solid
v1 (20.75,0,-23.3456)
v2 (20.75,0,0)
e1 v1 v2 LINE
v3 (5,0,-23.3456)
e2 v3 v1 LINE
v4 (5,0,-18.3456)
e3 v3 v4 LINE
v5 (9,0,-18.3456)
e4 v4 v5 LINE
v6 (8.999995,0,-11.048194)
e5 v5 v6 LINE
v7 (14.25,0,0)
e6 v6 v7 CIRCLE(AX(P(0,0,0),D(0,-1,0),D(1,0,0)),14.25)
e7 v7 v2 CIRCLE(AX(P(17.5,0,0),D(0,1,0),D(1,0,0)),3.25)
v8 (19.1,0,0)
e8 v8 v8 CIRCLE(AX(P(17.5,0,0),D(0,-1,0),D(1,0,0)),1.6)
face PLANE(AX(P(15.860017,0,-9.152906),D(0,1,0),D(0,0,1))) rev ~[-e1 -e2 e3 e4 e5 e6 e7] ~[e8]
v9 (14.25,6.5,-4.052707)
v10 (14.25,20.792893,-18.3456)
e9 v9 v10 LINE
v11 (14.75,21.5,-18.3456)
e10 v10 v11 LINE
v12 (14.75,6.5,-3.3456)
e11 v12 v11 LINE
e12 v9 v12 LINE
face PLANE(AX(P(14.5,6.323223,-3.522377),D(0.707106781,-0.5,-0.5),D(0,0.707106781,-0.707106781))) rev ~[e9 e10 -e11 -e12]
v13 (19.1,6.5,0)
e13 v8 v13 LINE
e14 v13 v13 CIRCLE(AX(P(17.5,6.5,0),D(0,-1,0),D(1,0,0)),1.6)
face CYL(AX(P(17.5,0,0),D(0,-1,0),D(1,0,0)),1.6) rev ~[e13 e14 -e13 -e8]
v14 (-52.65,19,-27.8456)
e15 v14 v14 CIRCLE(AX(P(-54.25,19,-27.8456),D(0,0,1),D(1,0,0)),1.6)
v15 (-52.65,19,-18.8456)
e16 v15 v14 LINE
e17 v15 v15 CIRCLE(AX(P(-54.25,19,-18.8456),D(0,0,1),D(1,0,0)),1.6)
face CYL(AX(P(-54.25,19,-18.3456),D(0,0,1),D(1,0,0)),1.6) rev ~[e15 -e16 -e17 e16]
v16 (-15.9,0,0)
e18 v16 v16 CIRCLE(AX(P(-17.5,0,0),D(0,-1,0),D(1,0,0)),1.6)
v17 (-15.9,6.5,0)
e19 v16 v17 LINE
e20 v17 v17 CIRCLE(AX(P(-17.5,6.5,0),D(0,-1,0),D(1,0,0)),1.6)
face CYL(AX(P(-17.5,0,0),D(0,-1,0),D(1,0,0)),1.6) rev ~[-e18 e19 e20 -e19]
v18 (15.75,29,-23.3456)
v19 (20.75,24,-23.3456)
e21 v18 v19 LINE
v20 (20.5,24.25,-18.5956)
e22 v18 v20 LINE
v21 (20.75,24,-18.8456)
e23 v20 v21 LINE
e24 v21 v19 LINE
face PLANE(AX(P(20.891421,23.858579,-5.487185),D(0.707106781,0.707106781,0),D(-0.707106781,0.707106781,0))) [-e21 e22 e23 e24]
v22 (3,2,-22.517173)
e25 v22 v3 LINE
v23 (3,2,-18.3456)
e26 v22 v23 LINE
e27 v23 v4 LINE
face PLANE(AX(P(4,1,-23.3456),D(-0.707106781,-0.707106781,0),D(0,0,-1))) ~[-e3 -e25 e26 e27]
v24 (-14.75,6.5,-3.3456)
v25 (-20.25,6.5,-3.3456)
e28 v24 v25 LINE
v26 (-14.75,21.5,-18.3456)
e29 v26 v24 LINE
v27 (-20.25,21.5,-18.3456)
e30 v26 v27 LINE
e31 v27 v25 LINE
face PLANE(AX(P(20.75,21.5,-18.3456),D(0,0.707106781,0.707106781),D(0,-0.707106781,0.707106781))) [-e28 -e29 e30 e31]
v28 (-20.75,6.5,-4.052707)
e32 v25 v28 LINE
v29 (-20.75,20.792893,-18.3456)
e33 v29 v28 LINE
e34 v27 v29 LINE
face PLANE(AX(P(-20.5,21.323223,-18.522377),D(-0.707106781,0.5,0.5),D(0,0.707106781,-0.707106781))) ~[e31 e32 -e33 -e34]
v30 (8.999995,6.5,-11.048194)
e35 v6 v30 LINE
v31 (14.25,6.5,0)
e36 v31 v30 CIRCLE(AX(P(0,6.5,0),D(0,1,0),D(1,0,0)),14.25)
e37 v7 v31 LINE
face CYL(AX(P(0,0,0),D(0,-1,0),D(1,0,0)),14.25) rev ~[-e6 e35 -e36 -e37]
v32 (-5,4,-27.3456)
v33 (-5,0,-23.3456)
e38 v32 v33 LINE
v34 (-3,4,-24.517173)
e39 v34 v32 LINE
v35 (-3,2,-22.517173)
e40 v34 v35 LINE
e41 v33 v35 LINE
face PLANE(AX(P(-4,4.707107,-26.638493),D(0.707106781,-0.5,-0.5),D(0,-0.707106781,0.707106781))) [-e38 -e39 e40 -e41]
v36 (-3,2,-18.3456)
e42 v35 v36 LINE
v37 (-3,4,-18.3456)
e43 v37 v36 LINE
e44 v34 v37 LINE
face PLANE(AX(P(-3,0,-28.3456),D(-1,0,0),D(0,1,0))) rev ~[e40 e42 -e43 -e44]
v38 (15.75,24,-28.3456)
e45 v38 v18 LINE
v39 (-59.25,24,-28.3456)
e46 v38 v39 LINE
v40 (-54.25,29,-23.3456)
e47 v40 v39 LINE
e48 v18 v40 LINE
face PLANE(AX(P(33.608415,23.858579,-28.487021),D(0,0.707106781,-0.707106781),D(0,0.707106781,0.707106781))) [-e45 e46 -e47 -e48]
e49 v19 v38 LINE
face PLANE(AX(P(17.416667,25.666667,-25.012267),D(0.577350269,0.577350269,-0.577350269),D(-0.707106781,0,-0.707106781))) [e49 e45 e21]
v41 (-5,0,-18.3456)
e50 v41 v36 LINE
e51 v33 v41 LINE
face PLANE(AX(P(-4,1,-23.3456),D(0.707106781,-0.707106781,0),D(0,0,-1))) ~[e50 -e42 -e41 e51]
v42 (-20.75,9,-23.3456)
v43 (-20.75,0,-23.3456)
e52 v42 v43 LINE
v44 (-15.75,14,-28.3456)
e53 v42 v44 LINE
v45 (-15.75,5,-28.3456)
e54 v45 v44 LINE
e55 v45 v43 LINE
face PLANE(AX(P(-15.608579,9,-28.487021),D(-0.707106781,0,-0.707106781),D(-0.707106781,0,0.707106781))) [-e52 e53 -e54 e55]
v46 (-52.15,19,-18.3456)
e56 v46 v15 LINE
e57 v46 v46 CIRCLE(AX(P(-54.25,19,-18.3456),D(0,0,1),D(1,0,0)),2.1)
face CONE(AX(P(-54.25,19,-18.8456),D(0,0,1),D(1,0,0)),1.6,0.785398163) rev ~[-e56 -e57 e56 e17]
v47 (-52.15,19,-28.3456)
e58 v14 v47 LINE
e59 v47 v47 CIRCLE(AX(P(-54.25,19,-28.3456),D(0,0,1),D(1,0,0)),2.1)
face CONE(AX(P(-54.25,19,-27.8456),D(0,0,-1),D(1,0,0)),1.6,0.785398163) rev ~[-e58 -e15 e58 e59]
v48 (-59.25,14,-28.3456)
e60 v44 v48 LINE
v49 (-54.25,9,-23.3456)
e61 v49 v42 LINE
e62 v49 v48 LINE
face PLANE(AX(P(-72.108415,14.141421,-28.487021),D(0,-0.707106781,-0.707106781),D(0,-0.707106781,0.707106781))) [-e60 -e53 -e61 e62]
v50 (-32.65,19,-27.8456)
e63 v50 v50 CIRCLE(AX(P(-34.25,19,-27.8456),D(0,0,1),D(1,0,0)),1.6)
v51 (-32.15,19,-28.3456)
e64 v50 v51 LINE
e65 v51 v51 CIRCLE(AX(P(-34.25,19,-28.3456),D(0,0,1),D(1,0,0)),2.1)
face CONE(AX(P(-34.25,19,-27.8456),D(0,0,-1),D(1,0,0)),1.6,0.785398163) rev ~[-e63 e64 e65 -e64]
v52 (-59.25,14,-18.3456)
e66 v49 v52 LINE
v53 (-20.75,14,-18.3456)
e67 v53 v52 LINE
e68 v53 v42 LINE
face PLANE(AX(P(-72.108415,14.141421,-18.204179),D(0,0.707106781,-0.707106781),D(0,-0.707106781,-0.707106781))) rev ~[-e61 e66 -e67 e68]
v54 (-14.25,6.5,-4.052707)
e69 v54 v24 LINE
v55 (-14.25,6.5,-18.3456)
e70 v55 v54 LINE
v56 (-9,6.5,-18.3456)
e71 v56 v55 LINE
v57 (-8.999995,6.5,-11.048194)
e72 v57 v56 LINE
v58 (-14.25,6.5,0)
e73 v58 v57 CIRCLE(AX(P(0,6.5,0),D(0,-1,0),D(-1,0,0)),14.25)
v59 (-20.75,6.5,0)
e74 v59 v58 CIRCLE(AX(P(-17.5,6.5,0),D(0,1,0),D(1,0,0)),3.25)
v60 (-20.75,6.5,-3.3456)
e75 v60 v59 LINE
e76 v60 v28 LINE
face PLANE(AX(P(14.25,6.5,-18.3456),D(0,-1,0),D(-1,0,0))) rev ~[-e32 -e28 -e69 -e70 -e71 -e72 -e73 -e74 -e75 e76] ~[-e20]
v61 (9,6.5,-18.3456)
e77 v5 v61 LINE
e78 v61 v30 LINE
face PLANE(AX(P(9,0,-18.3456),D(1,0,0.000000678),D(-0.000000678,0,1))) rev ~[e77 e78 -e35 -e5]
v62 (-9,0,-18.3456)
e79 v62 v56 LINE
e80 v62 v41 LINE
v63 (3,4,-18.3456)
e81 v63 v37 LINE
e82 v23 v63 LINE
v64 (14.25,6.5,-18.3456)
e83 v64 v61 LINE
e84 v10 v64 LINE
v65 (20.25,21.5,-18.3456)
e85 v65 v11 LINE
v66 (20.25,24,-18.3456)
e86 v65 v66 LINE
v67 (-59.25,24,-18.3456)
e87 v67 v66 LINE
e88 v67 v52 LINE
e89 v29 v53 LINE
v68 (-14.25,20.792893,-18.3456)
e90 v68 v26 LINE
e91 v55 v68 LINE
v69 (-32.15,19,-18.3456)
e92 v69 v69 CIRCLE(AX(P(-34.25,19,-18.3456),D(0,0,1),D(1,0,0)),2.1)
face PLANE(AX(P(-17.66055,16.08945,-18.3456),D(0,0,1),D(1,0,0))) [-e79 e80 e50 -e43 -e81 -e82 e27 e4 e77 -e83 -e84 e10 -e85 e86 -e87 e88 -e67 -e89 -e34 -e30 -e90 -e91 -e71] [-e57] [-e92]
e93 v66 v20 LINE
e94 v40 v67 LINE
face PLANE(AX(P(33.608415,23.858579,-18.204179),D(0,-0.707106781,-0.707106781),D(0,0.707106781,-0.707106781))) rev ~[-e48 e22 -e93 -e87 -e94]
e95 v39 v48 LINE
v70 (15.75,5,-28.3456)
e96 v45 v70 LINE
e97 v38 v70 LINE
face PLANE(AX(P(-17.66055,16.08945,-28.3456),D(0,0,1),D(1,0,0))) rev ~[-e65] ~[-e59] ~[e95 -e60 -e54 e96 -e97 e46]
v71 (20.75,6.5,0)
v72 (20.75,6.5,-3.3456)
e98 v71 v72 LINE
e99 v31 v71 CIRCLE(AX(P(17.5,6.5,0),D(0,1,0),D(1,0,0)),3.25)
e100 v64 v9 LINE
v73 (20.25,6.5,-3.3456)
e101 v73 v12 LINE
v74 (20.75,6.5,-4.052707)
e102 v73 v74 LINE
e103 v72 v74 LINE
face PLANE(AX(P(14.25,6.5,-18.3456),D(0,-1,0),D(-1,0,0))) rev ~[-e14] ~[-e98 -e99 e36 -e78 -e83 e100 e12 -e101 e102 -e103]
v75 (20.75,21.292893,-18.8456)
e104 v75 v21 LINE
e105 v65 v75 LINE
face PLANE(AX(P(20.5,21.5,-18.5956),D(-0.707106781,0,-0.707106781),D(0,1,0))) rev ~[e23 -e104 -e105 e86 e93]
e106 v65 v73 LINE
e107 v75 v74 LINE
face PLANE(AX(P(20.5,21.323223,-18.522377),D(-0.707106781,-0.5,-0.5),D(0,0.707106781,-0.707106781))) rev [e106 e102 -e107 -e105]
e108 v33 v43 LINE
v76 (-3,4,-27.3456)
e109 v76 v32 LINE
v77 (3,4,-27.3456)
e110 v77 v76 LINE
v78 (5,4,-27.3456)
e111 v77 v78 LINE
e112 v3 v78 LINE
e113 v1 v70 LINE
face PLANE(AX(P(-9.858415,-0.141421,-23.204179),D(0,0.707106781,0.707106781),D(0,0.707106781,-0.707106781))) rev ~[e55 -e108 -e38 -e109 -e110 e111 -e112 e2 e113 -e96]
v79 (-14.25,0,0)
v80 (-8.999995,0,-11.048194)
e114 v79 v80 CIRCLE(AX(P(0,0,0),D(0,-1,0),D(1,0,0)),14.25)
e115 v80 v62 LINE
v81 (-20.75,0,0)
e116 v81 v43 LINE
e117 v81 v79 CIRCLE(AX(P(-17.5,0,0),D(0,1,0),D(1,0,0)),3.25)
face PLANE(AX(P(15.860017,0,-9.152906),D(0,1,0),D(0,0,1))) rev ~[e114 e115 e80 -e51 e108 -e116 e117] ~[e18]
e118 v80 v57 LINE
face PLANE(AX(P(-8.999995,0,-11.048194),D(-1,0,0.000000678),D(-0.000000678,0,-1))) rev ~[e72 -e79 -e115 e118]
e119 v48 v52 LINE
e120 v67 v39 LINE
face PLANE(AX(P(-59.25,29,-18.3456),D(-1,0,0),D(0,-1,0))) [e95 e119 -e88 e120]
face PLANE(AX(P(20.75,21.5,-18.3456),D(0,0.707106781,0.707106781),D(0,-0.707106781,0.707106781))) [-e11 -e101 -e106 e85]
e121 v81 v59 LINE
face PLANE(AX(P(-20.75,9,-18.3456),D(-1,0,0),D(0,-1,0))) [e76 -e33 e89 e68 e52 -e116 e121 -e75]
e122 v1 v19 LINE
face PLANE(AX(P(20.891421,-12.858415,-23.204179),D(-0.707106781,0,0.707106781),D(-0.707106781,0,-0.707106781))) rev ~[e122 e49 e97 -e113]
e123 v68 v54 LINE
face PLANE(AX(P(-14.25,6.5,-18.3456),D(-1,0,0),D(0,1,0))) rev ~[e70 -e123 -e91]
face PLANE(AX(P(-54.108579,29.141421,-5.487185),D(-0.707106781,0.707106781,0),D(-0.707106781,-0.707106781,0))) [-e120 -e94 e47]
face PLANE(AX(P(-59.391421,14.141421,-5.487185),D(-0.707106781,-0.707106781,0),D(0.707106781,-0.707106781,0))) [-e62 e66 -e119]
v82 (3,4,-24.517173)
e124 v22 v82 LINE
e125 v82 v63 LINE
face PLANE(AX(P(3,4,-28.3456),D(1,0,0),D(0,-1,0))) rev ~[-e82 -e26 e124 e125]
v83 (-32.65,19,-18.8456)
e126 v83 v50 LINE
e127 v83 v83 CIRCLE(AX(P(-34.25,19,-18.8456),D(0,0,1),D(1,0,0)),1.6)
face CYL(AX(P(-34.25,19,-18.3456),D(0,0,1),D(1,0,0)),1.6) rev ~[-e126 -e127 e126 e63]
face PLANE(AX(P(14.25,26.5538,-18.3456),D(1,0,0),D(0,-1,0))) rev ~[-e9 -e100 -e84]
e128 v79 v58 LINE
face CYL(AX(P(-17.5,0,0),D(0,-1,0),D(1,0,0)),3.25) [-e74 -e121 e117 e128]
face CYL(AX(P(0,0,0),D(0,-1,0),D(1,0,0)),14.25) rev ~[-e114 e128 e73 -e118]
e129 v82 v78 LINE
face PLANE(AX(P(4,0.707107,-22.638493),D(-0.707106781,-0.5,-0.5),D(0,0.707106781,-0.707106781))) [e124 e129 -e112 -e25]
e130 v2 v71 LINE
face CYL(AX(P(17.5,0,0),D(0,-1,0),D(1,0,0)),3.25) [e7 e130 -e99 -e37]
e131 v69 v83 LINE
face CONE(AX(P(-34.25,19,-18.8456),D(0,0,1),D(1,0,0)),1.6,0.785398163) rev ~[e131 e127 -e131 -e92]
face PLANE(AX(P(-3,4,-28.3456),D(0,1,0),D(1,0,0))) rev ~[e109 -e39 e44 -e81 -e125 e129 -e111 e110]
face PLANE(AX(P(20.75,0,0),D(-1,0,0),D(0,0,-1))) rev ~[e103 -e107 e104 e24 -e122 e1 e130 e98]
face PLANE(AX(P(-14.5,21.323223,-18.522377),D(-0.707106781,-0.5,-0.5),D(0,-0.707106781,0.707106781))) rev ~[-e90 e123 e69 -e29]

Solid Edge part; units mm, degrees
sketch "Sketch1" plane through (0, 0, 0) normal (0, -1, 0) x (1, 0, 0)
  circle A0 centre (-17.5, 0) radius 1.6
  line L0 (-20.75, -18.3456) -> (-20.75, 0)
  line L1 (-9, -18.3456) -> (-20.75, -18.3456)
  line L2 (-9, -11.0482) -> (-9, -18.3456)
  arc A1 (-14.25, 0) -> (-9, -11.0482) centre (0, 0) ccw
  arc A2 (-20.75, 0) -> (-14.25, 0) centre (-17.5, 0) cw
  arc A3 (9, -11.0482) -> (14.25, 0) centre (0, 0) ccw
  arc A4 (14.25, 0) -> (20.75, 0) centre (17.5, 0) cw
  line L3 (20.75, 0) -> (20.75, -18.3456)
  line L4 (20.75, -18.3456) -> (9, -18.3456)
  line L5 (9, -18.3456) -> (9, -11.0482)
  circle A5 centre (17.5, 0) radius 1.6
  dimension "D1" = 35
  dimension "D2" = 17.5
  dimension "D3" = 6.5
  dimension "D4" = 9
  dimension "D5" = 9
extrude "Protrusion1" add sketch "Sketch1" against normal blind 6.5
sketch "Sketch2" plane through (14.875, 3.25, -18.3456) normal (0, 0, -1) x (0, -1, 0)
  line L0 (3.25, -5.875) -> (-25.75, -5.875)
  line L1 (-25.75, -5.875) -> (-25.75, 74.125)
  line L2 (-25.75, 74.125) -> (-5.75, 74.125)
  line L3 (-5.75, 74.125) -> (-5.75, 35.625)
  line L4 (-5.75, 35.625) -> (3.25, 35.625)
  line L5 (3.25, 35.625) -> (3.25, -5.875)
  dimension "D1" = 29
  dimension "D2" = 20
  dimension "D3" = 80
extrude "ExtrudedProtrusion_3" add sketch "Sketch2" along normal blind 10
sketch "Sketch3" plane through (-9.25, 14.5, -28.3456) normal (0, 0, -1) x (0, 1, 0)
  line L0 (-14.5, 12.25) -> (-14.5, 6.25)
  line L1 (-14.5, 6.25) -> (-10.5, 6.25)
  line L2 (-10.5, 6.25) -> (-10.5, 12.25)
  line L3 (-10.5, 12.25) -> (-14.5, 12.25)
  dimension "D1" = 6
  dimension "D2" = 4
extrude "ExtrudedCutout_1" cut sketch "Sketch3" against normal blind 42.3456
sketch "Sketch4" plane through (20.75, 14.5, -14.1728) normal (1, 0, 0) x (0, -1, 0)
  line L0 (-7, 4.1728) -> (8, -10.8272)
  line L1 (8, 4.1728) -> (8, -10.8272)
  line L2 (-7, 4.1728) -> (8, 4.1728)
extrude "Protrusion2" add sketch "Sketch4" against normal up to vertex (41.5 mm away)
sketch "Sketch5" plane through (-9.25, 19, -18.3456) normal (0, 0, 1) x (1, 0, 0)
  line L0 (-5, -12.5) -> (-5, 7.5538)
  line L1 (-5, 7.5538) -> (23.5, 7.5538)
  line L2 (23.5, 7.5538) -> (23.5, -12.5)
  line L3 (23.5, -12.5) -> (-5, -12.5)
extrude "ExtrudedCutout_2" cut sketch "Sketch5" along normal blind 49
sketch "Sketch6" plane through (-19.25, 14.5, -18.3456) normal (0, 0, 1) x (1, 0, 0)
  circle A0 centre (-35, 4.5) radius 1.6
  circle A1 centre (-15, 4.5) radius 1.6
extrude "ExtrudedCutout_3" cut sketch "Sketch6" against normal blind 30
chamfer "Letörés_1" distance 5 angle 45 11 edges at (-40, 9, -28.3456) (-40, 9, -18.3456) (-59.25, 9, -23.3456) (-59.25, 29, -23.3456) (-19.25, 29, -28.3456) (-19.25, 29, -18.3456) (20.75, 29, -23.3456) (20.75, 14.5, -28.3456) (-20.75, 4.5, -28.3456) (11.875, 0, -28.3456) (-11.875, 0, -28.3456)
chamfer "Letörés_3" distance 0.5 angle 45 9 edges at (-20.75, 14, -10.8456) (-14.25, 14, -10.8456) (14.25, 14, -10.8456) (20.75, 14, -10.8456) (20.75, 22.75, -18.3456) (-35.85, 19, -18.3456) (-35.85, 19, -28.3456) (-55.85, 19, -18.3456) (-55.85, 19, -28.3456)
chamfer "Letörés_4" distance 2 angle 45 4 edges at (-3, 0, -20.8456) (-3, 2, -25.3456) (3, 2, -25.3456) (3, 0, -20.8456)
